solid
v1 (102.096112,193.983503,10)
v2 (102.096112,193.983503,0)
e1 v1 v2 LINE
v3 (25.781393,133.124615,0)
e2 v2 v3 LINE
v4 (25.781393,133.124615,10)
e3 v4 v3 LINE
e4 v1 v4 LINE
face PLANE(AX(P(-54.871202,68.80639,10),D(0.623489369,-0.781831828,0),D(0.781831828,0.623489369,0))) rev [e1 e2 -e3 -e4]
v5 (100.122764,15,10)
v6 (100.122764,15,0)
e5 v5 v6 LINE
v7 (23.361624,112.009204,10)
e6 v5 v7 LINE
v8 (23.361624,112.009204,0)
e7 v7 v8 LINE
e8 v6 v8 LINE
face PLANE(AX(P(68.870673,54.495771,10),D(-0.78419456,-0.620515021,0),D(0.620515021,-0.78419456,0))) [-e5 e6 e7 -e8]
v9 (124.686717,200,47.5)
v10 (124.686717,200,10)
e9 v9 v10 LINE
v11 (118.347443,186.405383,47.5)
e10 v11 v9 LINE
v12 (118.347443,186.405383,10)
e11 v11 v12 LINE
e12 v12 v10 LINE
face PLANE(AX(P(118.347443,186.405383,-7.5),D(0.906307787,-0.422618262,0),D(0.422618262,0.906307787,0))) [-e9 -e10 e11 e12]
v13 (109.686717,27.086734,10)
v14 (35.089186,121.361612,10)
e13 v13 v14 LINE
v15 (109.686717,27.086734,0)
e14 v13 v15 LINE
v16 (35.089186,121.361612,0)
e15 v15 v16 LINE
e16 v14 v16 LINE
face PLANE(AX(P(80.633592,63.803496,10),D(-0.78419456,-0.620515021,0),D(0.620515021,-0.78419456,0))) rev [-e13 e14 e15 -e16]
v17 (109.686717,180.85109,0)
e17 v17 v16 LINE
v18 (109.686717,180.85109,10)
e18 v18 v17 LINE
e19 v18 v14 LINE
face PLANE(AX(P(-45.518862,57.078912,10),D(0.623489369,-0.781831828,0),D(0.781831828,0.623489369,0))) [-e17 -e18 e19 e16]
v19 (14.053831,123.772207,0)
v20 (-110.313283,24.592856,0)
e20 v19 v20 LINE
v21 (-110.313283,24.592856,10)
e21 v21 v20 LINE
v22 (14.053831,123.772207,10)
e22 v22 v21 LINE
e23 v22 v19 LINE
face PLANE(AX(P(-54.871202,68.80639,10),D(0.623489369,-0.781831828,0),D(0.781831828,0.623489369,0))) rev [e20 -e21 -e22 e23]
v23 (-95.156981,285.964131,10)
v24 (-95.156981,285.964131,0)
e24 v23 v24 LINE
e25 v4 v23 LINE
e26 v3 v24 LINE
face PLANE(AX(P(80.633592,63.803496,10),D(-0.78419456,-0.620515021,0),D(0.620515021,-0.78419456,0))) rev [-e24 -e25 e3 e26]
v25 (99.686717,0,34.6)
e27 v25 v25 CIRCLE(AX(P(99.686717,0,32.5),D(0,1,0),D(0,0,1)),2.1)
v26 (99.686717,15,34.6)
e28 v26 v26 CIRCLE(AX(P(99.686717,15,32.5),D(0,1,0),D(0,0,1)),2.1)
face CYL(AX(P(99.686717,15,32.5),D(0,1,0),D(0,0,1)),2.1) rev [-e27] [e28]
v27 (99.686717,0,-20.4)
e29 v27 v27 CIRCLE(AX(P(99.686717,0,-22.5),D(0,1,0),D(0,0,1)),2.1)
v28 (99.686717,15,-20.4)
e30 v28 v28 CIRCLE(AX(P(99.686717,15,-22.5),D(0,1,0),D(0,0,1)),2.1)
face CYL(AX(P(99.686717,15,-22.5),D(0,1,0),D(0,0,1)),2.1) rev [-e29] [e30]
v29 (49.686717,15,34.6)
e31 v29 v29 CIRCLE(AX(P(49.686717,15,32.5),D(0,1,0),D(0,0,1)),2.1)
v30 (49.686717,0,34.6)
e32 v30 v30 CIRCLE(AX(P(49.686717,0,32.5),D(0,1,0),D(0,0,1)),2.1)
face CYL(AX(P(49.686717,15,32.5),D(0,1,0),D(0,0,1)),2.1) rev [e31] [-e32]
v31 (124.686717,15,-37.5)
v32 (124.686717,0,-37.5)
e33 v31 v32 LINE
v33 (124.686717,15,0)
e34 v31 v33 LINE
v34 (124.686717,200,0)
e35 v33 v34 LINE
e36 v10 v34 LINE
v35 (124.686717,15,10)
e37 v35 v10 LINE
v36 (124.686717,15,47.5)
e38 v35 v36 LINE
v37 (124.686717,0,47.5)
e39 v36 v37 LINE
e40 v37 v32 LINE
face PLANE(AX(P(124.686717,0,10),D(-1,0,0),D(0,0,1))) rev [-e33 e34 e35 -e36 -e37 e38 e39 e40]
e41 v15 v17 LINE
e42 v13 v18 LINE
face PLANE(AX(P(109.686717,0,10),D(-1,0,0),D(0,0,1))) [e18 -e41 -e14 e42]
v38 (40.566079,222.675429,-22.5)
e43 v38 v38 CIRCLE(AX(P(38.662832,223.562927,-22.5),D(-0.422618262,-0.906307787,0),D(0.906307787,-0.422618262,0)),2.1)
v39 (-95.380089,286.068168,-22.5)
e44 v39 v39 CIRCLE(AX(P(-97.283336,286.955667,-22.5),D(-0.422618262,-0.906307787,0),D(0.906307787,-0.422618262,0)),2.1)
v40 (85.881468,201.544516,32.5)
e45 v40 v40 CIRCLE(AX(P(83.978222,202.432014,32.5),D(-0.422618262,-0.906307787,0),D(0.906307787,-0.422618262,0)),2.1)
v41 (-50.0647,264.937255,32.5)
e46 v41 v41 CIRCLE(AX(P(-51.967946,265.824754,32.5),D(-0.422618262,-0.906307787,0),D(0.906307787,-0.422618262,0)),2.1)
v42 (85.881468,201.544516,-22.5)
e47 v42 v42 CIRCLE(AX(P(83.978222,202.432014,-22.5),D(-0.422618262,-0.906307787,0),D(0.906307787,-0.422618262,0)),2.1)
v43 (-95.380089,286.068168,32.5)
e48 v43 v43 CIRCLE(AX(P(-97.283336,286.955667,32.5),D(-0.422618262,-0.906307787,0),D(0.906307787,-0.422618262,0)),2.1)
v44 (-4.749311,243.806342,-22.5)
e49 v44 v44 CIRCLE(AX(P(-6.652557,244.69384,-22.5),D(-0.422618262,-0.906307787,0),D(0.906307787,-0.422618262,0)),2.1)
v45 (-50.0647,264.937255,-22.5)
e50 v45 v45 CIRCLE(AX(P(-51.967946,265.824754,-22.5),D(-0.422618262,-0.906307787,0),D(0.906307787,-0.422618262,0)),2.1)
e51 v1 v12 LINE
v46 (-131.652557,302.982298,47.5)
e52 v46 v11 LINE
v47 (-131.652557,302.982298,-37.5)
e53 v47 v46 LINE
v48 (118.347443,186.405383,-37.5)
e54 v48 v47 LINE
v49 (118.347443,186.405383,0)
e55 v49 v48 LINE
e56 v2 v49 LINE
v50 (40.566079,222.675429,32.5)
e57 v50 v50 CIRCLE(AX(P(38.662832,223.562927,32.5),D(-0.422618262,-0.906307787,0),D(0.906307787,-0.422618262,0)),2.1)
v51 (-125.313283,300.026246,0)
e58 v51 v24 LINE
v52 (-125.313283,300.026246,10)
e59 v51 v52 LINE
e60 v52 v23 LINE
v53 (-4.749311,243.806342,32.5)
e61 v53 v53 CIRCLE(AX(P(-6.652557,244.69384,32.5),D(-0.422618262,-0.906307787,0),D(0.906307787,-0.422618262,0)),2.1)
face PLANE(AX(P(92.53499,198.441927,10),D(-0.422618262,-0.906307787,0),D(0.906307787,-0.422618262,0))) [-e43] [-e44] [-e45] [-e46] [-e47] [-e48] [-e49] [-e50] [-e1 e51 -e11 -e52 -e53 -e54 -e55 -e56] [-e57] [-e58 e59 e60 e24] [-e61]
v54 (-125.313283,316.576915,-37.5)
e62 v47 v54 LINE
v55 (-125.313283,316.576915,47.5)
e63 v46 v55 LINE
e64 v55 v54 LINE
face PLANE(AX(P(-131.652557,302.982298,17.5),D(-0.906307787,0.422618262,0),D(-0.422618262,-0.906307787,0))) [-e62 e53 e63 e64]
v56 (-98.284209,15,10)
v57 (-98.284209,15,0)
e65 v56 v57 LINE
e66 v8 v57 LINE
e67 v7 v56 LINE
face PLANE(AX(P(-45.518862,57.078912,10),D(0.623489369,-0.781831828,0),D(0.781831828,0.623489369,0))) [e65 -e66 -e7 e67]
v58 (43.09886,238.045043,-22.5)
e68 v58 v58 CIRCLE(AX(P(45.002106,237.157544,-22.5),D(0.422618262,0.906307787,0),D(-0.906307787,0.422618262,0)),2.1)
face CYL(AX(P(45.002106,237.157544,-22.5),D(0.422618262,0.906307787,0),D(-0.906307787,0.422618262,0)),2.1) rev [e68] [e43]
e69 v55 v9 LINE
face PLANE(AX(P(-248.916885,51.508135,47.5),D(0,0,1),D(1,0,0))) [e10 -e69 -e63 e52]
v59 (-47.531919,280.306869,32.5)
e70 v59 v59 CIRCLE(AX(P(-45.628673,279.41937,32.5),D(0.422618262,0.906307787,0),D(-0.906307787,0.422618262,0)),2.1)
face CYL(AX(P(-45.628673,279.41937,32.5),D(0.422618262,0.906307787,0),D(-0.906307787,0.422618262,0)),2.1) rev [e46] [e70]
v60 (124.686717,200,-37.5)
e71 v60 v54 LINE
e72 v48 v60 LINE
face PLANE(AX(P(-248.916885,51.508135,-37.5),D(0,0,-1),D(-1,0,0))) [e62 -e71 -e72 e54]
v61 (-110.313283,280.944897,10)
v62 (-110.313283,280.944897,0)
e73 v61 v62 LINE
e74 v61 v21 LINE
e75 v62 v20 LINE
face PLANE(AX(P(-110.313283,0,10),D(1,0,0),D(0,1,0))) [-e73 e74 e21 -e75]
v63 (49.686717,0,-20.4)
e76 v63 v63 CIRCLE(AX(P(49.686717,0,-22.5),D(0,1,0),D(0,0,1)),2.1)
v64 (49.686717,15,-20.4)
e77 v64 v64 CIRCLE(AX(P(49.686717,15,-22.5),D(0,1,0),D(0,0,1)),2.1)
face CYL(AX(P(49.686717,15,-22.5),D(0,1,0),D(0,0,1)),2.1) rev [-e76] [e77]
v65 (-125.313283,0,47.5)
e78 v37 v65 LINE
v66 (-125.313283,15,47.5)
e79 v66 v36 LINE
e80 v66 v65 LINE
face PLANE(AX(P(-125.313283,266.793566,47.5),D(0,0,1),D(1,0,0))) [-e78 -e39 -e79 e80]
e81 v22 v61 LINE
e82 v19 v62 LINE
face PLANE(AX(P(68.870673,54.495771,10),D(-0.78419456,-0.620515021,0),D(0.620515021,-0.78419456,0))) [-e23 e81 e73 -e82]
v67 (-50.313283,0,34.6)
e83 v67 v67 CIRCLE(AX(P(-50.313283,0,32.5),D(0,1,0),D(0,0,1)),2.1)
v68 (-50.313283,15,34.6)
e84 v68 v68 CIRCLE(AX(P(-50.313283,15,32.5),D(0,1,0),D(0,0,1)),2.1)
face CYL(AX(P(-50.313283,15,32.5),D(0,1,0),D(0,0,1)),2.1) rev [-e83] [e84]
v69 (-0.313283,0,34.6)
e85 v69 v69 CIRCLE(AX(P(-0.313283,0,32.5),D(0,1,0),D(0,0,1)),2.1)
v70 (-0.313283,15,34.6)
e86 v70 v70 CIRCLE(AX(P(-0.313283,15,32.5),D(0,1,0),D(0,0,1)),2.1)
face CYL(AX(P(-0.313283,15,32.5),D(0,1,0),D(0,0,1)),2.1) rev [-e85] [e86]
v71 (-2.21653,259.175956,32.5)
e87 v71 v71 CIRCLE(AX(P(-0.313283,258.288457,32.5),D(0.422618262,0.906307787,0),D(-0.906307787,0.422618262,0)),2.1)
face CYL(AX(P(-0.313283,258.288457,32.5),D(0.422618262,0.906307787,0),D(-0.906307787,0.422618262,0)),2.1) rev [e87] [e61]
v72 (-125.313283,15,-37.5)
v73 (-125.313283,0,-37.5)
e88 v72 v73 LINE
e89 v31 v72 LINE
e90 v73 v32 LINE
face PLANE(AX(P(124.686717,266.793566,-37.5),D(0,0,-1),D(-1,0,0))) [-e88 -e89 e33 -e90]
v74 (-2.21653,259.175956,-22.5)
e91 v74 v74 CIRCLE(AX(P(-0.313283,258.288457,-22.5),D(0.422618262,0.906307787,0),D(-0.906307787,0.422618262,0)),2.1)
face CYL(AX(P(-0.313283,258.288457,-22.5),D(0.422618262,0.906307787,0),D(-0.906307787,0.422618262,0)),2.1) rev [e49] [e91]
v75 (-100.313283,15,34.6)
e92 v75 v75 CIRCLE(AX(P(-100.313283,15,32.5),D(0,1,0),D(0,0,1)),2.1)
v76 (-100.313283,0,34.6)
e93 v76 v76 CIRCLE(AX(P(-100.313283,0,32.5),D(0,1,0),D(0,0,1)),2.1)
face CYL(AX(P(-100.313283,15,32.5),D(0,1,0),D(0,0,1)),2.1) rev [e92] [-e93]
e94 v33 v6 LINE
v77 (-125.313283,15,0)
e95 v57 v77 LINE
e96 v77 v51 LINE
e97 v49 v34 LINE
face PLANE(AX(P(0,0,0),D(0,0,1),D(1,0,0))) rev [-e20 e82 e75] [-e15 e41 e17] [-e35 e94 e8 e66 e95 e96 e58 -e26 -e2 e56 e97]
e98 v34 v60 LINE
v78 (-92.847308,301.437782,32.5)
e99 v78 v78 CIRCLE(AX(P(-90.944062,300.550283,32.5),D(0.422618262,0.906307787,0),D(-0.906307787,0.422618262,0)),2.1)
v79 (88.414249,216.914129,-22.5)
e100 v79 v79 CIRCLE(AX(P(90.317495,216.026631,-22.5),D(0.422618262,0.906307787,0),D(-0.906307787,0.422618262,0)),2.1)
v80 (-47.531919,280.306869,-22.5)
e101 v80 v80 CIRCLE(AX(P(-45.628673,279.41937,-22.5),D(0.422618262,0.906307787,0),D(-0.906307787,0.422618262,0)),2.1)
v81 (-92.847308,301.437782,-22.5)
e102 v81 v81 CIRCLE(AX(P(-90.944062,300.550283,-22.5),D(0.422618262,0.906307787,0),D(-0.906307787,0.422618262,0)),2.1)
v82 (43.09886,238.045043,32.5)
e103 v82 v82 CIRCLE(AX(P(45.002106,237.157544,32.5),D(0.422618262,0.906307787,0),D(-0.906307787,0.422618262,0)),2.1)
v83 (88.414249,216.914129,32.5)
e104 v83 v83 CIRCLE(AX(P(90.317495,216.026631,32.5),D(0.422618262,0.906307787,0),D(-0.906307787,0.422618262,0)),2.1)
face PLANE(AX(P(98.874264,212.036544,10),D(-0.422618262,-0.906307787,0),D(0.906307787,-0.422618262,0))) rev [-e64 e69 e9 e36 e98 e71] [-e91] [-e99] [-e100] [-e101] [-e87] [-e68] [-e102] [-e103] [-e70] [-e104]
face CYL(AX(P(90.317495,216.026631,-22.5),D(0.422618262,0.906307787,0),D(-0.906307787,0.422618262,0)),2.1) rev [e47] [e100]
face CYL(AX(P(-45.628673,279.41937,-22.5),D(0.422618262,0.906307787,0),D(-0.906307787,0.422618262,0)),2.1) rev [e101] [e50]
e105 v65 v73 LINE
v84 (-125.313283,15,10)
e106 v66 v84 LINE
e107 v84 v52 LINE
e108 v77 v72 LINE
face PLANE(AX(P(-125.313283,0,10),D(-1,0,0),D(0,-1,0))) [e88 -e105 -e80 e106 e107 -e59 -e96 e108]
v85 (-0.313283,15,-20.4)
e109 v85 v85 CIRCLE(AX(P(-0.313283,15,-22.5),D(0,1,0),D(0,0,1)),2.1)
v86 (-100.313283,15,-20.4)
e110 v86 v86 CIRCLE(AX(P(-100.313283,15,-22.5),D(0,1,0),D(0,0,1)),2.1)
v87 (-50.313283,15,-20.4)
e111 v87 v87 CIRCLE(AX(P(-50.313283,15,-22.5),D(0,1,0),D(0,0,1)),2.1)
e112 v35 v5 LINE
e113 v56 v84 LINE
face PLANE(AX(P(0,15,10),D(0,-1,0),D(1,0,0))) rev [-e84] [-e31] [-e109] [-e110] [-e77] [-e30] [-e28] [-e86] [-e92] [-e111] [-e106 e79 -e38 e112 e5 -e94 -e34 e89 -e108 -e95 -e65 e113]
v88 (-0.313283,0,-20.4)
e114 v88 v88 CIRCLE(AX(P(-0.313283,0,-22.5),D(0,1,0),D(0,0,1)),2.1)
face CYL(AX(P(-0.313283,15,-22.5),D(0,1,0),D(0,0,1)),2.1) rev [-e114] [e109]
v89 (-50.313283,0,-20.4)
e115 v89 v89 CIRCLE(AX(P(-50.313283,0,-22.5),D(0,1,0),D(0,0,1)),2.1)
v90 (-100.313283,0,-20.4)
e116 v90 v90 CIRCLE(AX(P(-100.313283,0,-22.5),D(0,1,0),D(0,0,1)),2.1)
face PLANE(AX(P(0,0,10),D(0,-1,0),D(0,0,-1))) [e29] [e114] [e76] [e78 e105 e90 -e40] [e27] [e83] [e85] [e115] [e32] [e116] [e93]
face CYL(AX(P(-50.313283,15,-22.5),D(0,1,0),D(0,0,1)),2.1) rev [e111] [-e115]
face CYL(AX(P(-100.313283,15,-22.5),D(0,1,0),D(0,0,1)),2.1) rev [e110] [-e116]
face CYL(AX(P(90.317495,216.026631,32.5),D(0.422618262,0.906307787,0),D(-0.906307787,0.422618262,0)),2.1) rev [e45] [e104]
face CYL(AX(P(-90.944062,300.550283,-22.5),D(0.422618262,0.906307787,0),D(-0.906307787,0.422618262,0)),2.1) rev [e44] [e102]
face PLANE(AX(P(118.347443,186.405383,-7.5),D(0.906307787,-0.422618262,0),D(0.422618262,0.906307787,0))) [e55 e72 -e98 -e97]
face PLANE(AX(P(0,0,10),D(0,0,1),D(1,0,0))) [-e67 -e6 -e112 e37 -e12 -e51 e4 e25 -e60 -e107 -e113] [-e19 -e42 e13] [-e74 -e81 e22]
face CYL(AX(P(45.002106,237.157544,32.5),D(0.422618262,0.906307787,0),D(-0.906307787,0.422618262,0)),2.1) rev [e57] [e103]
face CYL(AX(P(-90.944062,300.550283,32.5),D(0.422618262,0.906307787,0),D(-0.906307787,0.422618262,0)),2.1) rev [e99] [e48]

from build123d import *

# Parameters (mm, degrees)
EXTRUDE_1_DEPTH            = 10
SKETCH_3_W                 = 250
SKETCH_3_H                 = 25
EXTRUDE_3_DEPTH            = 15
SKETCH_4_W                 = 275.84447974
SKETCH_4_H                 = 25
EXTRUDE_4_DEPTH            = 15
SKETCH_10_W                = 250
SKETCH_10_H                = 30
EXTRUDE_5_DEPTH            = 15
SKETCH_11_W                = 275.84447974
SKETCH_11_H                = 30
EXTRUDE_6_DEPTH            = 15
HOLE_WIZARD_M5_1_D         = 4.2
HOLE_WIZARD_M5_1_DEPTH     = 15
PATTERN_LINEAR_1_COUNT     = 5
PATTERN_LINEAR_1_PITCH     = 50
MIRROR_1_COPY_1_D          = 4.2
MIRROR_1_COPY_1_DEPTH      = 15
MIRROR_1_COPY_2_D          = 4.2
MIRROR_1_COPY_2_DEPTH      = 15
MIRROR_1_COPY_3_D          = 4.2
MIRROR_1_COPY_3_DEPTH      = 15
MIRROR_1_COPY_4_D          = 4.2
MIRROR_1_COPY_4_DEPTH      = 15
HOLE_WIZARD_M5_2_D         = 4.2
PATTERN_START              = 218.95644092
PATTERN_LINEAR_2_OUTLINE_R = 2.1
PATTERN_LINEAR_2_DEPTH     = 15
HOLE_WIZARD_M5_3_D         = 4.2
PATTERN_LINEAR_3_OUTLINE_R = 2.1
PATTERN_LINEAR_3_DEPTH     = 15


# Read off the part's stored shape, not the designer's step: 阵列(线性)2, 阵列(线性)3
with BuildPart() as part:
    # 草图1 → 凸台-拉伸1 (new body)
    with BuildSketch(Plane.XY):
        Polygon((-125.313283208, 0), (124.686716792, 0), (124.686716792, 200), (-125.313283208, 316.576914539), align=None)
        Polygon((-110.313283208, 24.592855818), (-110.313283208, 280.944896886), (14.053831361, 123.772207379), (-107.63654934, 26.72747742), align=None, mode=Mode.SUBTRACT)
        Polygon((23.361623829, 112.009204107), (100.122763689, 15), (-98.284208811, 15), align=None, mode=Mode.SUBTRACT)
        Polygon((109.686716792, 180.85109027), (109.686716792, 27.086733996), (35.089185859, 121.36161211), align=None, mode=Mode.SUBTRACT)
        Polygon((-95.156980934, 285.964131062), (102.096111819, 193.983503317), (100.334376264, 192.57856769), (25.781393391, 133.124615382), align=None, mode=Mode.SUBTRACT)
    extrude(amount=EXTRUDE_1_DEPTH)

    # 草图3 → 凸台-拉伸3 (add)
    with BuildSketch(Plane.XZ):
        with Locations((-0.313283208, 5)):
            Rectangle(SKETCH_3_W, SKETCH_3_H)
    extrude(amount=-EXTRUDE_3_DEPTH)

    # 草图4 → 凸台-拉伸4 (add)
    with BuildSketch(Plane(origin=(98.874264385, 212.036544233, 0), x_dir=(0.9063077870366497, -0.4226182617407002, 0), z_dir=(0.42261826174070016, 0.9063077870366496, 0))):
        with Locations((-109.44134985, -5)):
            Rectangle(SKETCH_4_W, SKETCH_4_H)
    extrude(amount=-EXTRUDE_4_DEPTH)

    # 草图10 → 凸台-拉伸5 (add)
    with BuildSketch(Plane.XZ):
        with Locations((-0.313283208, 32.5)):
            Rectangle(SKETCH_10_W, SKETCH_10_H)
        with Locations((-0.313283208, -22.5)):
            Rectangle(SKETCH_10_W, SKETCH_10_H)
    extrude(amount=-EXTRUDE_5_DEPTH)

    # 草图11 → 凸台-拉伸6 (add)
    with BuildSketch(Plane(origin=(98.874264385, 212.036544233, 0), x_dir=(0.9063077870366497, -0.4226182617407002, 0), z_dir=(0.42261826174070016, 0.9063077870366496, 0))):
        with Locations((-109.44134985, 22.5)):
            Rectangle(SKETCH_11_W, SKETCH_11_H)
        with Locations((-109.44134985, -32.5)):
            Rectangle(SKETCH_11_W, SKETCH_11_H)
    extrude(amount=-EXTRUDE_6_DEPTH)

    # M5 螺纹孔1
    with Locations(Plane(origin=(-100.313283208, 15, 32.5), x_dir=(0, 0, 1), z_dir=(0, 1, 0))):
        with Locations((0, 0)):
            hole_wizard_m5_1 = Hole(HOLE_WIZARD_M5_1_D / 2, depth=HOLE_WIZARD_M5_1_DEPTH)

    # 阵列(线性)1: M5 螺纹孔1 ×5
    with Locations(*[(i * PATTERN_LINEAR_1_PITCH, 0, 0) for i in range(1, PATTERN_LINEAR_1_COUNT)]):
        add(hole_wizard_m5_1, mode=Mode.SUBTRACT)

    # 镜向1: M5 螺纹孔1 across plane
    add(hole_wizard_m5_1.mirror(Plane(origin=(0, 0, 5), x_dir=(1, 0, 0), z_dir=(0, 0, -1))), mode=Mode.SUBTRACT)

    # 镜向1 copy 1
    with Locations(Plane(origin=(-50.313283208, 15, -22.5), x_dir=(0, 0, -1), z_dir=(0, 1, 0))):
        with Locations((0, 0)):
            Hole(MIRROR_1_COPY_1_D / 2, depth=MIRROR_1_COPY_1_DEPTH)

    # 镜向1 copy 2
    with Locations(Plane(origin=(-0.313283208, 15, -22.5), x_dir=(0, 0, -1), z_dir=(0, 1, 0))):
        with Locations((0, 0)):
            Hole(MIRROR_1_COPY_2_D / 2, depth=MIRROR_1_COPY_2_DEPTH)

    # 镜向1 copy 3
    with Locations(Plane(origin=(49.686716792, 15, -22.5), x_dir=(0, 0, -1), z_dir=(0, 1, 0))):
        with Locations((0, 0)):
            Hole(MIRROR_1_COPY_3_D / 2, depth=MIRROR_1_COPY_3_DEPTH)

    # 镜向1 copy 4
    with Locations(Plane(origin=(99.686716792, 15, -22.5), x_dir=(0, 0, -1), z_dir=(0, 1, 0))):
        with Locations((0, 0)):
            Hole(MIRROR_1_COPY_4_D / 2, depth=MIRROR_1_COPY_4_DEPTH)

    # M5 螺纹孔2 (through all)
    with Locations(Plane(origin=(-90.944061912, 300.550283443, -22.5), x_dir=(0.906307787037, -0.422618261741, 0), z_dir=(0.422618261741, 0.906307787037, 0))):
        with Locations((0, 0)):
            Hole(HOLE_WIZARD_M5_2_D / 2)

    # 阵列(线性)2 outline → 阵列(线性)2 (cut)
    with BuildSketch(Plane(origin=(0, 0, 0), x_dir=(0.9063077870366497, -0.42261826174069983, 0), z_dir=(0.4226182617406999, 0.9063077870366498, 0)).offset(PATTERN_START)):
        with Locations((-159.44134985, 22.5)):
            Circle(PATTERN_LINEAR_2_OUTLINE_R)
        with Locations((-109.44134985, 22.5)):
            Circle(PATTERN_LINEAR_2_OUTLINE_R)
        with Locations((-59.44134985, 22.5)):
            Circle(PATTERN_LINEAR_2_OUTLINE_R)
        with Locations((-9.44134985, 22.5)):
            Circle(PATTERN_LINEAR_2_OUTLINE_R)
    extrude(amount=PATTERN_LINEAR_2_DEPTH, mode=Mode.SUBTRACT)

    # M5 螺纹孔3 (through all)
    with Locations(Plane(origin=(-90.944061912, 300.550283443, 32.5), x_dir=(0.906307787037, -0.422618261741, 0), z_dir=(0.422618261741, 0.906307787037, 0))):
        with Locations((0, 0)):
            Hole(HOLE_WIZARD_M5_3_D / 2)

    # 阵列(线性)3 outline → 阵列(线性)3 (cut)
    with BuildSketch(Plane(origin=(0, 0, 0), x_dir=(0.9063077870366497, -0.42261826174069983, 0), z_dir=(0.4226182617406999, 0.9063077870366498, 0)).offset(PATTERN_START)):
        with Locations((-159.44134985, -32.5)):
            Circle(PATTERN_LINEAR_3_OUTLINE_R)
        with Locations((-109.44134985, -32.5)):
            Circle(PATTERN_LINEAR_3_OUTLINE_R)
        with Locations((-59.44134985, -32.5)):
            Circle(PATTERN_LINEAR_3_OUTLINE_R)
        with Locations((-9.44134985, -32.5)):
            Circle(PATTERN_LINEAR_3_OUTLINE_R)
    extrude(amount=PATTERN_LINEAR_3_DEPTH, mode=Mode.SUBTRACT)


solid = part.part
